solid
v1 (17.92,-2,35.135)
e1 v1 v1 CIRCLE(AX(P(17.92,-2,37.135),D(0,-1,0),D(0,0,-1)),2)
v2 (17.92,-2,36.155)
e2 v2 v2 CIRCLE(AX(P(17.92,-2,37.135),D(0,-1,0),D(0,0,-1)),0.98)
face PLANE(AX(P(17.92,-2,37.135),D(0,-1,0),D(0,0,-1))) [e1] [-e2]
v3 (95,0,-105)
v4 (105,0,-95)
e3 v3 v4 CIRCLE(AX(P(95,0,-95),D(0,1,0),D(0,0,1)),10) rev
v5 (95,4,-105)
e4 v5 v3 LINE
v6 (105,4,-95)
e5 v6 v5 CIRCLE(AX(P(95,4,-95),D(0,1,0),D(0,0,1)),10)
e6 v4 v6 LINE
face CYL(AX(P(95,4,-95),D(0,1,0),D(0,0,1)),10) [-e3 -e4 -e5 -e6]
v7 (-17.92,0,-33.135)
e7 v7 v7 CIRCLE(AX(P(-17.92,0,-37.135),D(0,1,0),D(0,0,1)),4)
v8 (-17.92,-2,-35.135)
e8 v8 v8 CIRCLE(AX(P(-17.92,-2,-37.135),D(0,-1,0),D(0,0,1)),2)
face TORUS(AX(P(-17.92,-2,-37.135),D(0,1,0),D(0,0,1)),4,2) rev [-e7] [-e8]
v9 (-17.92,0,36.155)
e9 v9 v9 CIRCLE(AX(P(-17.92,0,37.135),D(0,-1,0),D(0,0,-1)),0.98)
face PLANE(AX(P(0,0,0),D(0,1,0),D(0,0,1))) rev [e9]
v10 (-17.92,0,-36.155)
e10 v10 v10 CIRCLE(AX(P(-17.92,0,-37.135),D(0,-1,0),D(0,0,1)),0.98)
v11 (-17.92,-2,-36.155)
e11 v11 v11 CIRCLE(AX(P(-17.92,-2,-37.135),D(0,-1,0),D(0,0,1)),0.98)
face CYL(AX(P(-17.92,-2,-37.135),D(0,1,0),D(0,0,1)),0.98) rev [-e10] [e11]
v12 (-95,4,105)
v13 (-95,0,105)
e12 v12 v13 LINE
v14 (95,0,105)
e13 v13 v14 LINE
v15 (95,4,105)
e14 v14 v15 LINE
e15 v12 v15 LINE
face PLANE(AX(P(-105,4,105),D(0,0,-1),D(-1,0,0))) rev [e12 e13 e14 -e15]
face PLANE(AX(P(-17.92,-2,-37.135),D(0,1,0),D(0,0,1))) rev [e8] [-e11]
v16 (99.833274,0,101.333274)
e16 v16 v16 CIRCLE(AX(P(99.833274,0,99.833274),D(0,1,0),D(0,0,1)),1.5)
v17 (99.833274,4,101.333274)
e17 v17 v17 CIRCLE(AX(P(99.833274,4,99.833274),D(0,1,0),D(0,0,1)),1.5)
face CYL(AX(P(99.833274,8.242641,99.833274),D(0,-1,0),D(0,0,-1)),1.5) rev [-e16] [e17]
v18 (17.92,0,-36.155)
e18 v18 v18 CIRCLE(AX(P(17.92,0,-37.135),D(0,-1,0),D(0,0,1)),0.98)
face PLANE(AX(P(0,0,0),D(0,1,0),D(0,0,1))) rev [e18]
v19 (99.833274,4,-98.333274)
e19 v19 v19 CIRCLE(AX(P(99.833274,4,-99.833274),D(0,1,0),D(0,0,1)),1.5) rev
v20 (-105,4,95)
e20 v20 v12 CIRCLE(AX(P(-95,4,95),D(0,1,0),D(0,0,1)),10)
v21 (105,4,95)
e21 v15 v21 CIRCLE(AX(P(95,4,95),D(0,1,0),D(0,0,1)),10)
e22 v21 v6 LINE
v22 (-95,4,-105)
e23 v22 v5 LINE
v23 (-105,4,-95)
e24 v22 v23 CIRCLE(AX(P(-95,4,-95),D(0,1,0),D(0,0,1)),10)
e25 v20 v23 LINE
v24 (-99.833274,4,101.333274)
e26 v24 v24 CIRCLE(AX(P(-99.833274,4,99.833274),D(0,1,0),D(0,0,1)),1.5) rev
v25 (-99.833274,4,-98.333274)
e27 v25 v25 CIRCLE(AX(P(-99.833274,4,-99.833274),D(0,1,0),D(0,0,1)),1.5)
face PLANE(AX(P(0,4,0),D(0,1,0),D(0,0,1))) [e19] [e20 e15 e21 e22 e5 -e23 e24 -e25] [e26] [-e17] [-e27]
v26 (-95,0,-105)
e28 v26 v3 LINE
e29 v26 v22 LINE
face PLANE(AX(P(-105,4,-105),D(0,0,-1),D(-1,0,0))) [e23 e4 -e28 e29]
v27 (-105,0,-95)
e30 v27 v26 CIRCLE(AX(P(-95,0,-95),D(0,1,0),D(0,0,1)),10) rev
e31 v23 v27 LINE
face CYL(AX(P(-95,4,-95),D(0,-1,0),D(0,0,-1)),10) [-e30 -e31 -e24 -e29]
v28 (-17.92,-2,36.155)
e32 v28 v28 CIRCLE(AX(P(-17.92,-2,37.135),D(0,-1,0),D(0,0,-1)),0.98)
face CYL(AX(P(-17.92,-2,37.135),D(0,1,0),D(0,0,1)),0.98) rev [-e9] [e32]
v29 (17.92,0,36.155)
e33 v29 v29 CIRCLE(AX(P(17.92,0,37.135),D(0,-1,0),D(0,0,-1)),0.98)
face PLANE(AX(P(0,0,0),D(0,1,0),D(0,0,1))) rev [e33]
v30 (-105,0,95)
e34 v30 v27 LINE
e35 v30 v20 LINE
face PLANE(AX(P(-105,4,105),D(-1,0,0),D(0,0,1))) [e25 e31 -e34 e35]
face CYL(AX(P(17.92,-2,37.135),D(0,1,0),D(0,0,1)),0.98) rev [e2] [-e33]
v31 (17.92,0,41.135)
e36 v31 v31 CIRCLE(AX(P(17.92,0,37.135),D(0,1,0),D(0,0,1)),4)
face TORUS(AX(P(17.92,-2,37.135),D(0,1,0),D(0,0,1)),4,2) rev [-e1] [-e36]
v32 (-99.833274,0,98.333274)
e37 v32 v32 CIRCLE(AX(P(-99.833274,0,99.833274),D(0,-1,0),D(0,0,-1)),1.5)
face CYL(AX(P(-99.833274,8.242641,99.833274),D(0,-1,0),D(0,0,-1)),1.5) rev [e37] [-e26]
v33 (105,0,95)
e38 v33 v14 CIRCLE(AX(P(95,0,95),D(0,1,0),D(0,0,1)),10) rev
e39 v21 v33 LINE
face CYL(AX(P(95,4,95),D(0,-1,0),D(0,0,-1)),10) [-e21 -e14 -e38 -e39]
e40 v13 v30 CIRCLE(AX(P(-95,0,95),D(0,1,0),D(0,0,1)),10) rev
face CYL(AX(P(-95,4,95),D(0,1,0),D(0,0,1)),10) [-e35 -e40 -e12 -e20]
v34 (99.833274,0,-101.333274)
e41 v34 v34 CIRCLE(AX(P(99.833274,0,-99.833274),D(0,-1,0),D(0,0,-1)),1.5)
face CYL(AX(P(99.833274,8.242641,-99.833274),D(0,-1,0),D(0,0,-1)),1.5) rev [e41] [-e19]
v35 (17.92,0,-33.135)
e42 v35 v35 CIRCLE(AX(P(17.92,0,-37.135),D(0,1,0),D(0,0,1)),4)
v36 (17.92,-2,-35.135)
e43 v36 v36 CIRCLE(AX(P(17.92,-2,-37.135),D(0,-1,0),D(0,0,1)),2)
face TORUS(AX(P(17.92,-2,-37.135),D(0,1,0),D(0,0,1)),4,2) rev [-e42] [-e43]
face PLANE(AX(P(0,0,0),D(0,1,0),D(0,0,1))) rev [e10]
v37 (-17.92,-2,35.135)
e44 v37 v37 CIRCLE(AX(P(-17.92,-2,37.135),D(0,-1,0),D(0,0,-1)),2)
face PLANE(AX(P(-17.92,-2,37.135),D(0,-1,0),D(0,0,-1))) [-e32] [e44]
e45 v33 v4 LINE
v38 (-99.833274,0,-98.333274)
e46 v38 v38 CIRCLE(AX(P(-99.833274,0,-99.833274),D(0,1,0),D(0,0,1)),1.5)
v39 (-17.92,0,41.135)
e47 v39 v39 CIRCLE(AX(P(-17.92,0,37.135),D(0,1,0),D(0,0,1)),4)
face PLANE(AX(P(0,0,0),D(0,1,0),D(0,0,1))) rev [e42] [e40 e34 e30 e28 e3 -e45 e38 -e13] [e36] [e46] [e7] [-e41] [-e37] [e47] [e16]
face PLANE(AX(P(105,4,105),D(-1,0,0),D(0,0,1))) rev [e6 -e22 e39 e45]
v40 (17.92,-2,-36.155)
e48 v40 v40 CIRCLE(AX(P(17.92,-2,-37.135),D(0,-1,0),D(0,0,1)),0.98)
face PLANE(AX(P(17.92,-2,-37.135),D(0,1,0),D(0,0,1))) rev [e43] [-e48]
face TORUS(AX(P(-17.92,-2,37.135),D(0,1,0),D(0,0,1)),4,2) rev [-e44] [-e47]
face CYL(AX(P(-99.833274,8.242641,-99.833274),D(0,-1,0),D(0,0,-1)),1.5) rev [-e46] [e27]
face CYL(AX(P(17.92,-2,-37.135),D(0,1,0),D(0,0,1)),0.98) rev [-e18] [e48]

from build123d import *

# Parameters (mm, degrees)
SKETCH1_W         = 210
SKETCH1_H         = 210
MAINEXTRUDE_DEPTH = 4
SKETCH1_6_R       = 1.5
SCREWHOLES_DEPTH  = 4
ROUNDEDCORNERS_R  = 10
SKETCH2_R         = 2
SKETCH2_R_2       = 0.98
PCBHOLES_DEPTH    = 2
PCBROUNDS_R       = 2


with BuildPart() as part:
    # Sketch1 → MainExtrude (new body)
    with BuildSketch(Plane(origin=(0, 0, 0), x_dir=(1, 0, 0), z_dir=(0, 1, 0))):
        Rectangle(SKETCH1_W, SKETCH1_H)
    extrude(amount=MAINEXTRUDE_DEPTH)

    # Sketch1<6> → ScrewHoles (cut)
    with BuildSketch(Plane(origin=(0, 0, 0), x_dir=(1, 0, 0), z_dir=(0, 1, 0))):
        with Locations(Location((-99.833273811, 99.833273811, 0), (0, 0, 270))):
            Circle(SKETCH1_6_R)
        with Locations(Location((-99.833273811, -99.833273811, 0), (0, 0, 90))):
            Circle(SKETCH1_6_R)
        with Locations(Location((99.833273811, -99.833273811, 0), (0, 0, 270))):
            Circle(SKETCH1_6_R)
        with Locations(Location((99.833273811, 99.833273811, 0), (0, 0, 90))):
            Circle(SKETCH1_6_R)
    extrude(amount=SCREWHOLES_DEPTH, mode=Mode.SUBTRACT)

    # RoundedCorners
    roundedcorners_edges = [part.edges().sort_by_distance(p)[0] for p in [
        (-105, 2, -105),
        (-105, 2, 105),
        (105, 2, 105),
        (105, 2, -105),
    ]]
    fillet(roundedcorners_edges, radius=ROUNDEDCORNERS_R)

    # Sketch2 → PCBHoles (add)
    # profile 1 of 4: a face of its own
    with BuildSketch(Plane.XZ):
        with Locations(Location((-17.92, 37.135, 0), (0, 0, 90))):
            Circle(SKETCH2_R)
        with Locations(Location((-17.92, 37.135, 0), (0, 0, 270))):
            Circle(SKETCH2_R_2, mode=Mode.SUBTRACT)
    # profile 2 of 4: a face of its own
    with BuildSketch(Plane.XZ):
        with Locations(Location((17.92, 37.135, 0), (0, 0, 90))):
            Circle(SKETCH2_R)
        with Locations(Location((17.92, 37.135, 0), (0, 0, 270))):
            Circle(SKETCH2_R_2, mode=Mode.SUBTRACT)
    # profile 3 of 4: a face of its own
    with BuildSketch(Plane.XZ):
        with Locations(Location((-17.92, -37.135, 0), (0, 0, 90))):
            Circle(SKETCH2_R)
        with Locations(Location((-17.92, -37.135, 0), (0, 0, 90))):
            Circle(SKETCH2_R_2, mode=Mode.SUBTRACT)
    # profile 4 of 4: a face of its own
    with BuildSketch(Plane.XZ):
        with Locations(Location((17.92, -37.135, 0), (0, 0, 90))):
            Circle(SKETCH2_R)
        with Locations(Location((17.92, -37.135, 0), (0, 0, 90))):
            Circle(SKETCH2_R_2, mode=Mode.SUBTRACT)
    extrude(amount=PCBHOLES_DEPTH)

    # PCBRounds
    pcbrounds_edges = [part.edges().sort_by_distance(p)[0] for p in [
        (-17.92, 0, -39.135),
        (17.92, 0, -39.135),
        (-17.92, 0, 35.135),
        (17.92, 0, 35.135),
    ]]
    fillet(pcbrounds_edges, radius=PCBROUNDS_R - 0.0001)  # a hair under: the kernel refuses the full size


solid = part.part
